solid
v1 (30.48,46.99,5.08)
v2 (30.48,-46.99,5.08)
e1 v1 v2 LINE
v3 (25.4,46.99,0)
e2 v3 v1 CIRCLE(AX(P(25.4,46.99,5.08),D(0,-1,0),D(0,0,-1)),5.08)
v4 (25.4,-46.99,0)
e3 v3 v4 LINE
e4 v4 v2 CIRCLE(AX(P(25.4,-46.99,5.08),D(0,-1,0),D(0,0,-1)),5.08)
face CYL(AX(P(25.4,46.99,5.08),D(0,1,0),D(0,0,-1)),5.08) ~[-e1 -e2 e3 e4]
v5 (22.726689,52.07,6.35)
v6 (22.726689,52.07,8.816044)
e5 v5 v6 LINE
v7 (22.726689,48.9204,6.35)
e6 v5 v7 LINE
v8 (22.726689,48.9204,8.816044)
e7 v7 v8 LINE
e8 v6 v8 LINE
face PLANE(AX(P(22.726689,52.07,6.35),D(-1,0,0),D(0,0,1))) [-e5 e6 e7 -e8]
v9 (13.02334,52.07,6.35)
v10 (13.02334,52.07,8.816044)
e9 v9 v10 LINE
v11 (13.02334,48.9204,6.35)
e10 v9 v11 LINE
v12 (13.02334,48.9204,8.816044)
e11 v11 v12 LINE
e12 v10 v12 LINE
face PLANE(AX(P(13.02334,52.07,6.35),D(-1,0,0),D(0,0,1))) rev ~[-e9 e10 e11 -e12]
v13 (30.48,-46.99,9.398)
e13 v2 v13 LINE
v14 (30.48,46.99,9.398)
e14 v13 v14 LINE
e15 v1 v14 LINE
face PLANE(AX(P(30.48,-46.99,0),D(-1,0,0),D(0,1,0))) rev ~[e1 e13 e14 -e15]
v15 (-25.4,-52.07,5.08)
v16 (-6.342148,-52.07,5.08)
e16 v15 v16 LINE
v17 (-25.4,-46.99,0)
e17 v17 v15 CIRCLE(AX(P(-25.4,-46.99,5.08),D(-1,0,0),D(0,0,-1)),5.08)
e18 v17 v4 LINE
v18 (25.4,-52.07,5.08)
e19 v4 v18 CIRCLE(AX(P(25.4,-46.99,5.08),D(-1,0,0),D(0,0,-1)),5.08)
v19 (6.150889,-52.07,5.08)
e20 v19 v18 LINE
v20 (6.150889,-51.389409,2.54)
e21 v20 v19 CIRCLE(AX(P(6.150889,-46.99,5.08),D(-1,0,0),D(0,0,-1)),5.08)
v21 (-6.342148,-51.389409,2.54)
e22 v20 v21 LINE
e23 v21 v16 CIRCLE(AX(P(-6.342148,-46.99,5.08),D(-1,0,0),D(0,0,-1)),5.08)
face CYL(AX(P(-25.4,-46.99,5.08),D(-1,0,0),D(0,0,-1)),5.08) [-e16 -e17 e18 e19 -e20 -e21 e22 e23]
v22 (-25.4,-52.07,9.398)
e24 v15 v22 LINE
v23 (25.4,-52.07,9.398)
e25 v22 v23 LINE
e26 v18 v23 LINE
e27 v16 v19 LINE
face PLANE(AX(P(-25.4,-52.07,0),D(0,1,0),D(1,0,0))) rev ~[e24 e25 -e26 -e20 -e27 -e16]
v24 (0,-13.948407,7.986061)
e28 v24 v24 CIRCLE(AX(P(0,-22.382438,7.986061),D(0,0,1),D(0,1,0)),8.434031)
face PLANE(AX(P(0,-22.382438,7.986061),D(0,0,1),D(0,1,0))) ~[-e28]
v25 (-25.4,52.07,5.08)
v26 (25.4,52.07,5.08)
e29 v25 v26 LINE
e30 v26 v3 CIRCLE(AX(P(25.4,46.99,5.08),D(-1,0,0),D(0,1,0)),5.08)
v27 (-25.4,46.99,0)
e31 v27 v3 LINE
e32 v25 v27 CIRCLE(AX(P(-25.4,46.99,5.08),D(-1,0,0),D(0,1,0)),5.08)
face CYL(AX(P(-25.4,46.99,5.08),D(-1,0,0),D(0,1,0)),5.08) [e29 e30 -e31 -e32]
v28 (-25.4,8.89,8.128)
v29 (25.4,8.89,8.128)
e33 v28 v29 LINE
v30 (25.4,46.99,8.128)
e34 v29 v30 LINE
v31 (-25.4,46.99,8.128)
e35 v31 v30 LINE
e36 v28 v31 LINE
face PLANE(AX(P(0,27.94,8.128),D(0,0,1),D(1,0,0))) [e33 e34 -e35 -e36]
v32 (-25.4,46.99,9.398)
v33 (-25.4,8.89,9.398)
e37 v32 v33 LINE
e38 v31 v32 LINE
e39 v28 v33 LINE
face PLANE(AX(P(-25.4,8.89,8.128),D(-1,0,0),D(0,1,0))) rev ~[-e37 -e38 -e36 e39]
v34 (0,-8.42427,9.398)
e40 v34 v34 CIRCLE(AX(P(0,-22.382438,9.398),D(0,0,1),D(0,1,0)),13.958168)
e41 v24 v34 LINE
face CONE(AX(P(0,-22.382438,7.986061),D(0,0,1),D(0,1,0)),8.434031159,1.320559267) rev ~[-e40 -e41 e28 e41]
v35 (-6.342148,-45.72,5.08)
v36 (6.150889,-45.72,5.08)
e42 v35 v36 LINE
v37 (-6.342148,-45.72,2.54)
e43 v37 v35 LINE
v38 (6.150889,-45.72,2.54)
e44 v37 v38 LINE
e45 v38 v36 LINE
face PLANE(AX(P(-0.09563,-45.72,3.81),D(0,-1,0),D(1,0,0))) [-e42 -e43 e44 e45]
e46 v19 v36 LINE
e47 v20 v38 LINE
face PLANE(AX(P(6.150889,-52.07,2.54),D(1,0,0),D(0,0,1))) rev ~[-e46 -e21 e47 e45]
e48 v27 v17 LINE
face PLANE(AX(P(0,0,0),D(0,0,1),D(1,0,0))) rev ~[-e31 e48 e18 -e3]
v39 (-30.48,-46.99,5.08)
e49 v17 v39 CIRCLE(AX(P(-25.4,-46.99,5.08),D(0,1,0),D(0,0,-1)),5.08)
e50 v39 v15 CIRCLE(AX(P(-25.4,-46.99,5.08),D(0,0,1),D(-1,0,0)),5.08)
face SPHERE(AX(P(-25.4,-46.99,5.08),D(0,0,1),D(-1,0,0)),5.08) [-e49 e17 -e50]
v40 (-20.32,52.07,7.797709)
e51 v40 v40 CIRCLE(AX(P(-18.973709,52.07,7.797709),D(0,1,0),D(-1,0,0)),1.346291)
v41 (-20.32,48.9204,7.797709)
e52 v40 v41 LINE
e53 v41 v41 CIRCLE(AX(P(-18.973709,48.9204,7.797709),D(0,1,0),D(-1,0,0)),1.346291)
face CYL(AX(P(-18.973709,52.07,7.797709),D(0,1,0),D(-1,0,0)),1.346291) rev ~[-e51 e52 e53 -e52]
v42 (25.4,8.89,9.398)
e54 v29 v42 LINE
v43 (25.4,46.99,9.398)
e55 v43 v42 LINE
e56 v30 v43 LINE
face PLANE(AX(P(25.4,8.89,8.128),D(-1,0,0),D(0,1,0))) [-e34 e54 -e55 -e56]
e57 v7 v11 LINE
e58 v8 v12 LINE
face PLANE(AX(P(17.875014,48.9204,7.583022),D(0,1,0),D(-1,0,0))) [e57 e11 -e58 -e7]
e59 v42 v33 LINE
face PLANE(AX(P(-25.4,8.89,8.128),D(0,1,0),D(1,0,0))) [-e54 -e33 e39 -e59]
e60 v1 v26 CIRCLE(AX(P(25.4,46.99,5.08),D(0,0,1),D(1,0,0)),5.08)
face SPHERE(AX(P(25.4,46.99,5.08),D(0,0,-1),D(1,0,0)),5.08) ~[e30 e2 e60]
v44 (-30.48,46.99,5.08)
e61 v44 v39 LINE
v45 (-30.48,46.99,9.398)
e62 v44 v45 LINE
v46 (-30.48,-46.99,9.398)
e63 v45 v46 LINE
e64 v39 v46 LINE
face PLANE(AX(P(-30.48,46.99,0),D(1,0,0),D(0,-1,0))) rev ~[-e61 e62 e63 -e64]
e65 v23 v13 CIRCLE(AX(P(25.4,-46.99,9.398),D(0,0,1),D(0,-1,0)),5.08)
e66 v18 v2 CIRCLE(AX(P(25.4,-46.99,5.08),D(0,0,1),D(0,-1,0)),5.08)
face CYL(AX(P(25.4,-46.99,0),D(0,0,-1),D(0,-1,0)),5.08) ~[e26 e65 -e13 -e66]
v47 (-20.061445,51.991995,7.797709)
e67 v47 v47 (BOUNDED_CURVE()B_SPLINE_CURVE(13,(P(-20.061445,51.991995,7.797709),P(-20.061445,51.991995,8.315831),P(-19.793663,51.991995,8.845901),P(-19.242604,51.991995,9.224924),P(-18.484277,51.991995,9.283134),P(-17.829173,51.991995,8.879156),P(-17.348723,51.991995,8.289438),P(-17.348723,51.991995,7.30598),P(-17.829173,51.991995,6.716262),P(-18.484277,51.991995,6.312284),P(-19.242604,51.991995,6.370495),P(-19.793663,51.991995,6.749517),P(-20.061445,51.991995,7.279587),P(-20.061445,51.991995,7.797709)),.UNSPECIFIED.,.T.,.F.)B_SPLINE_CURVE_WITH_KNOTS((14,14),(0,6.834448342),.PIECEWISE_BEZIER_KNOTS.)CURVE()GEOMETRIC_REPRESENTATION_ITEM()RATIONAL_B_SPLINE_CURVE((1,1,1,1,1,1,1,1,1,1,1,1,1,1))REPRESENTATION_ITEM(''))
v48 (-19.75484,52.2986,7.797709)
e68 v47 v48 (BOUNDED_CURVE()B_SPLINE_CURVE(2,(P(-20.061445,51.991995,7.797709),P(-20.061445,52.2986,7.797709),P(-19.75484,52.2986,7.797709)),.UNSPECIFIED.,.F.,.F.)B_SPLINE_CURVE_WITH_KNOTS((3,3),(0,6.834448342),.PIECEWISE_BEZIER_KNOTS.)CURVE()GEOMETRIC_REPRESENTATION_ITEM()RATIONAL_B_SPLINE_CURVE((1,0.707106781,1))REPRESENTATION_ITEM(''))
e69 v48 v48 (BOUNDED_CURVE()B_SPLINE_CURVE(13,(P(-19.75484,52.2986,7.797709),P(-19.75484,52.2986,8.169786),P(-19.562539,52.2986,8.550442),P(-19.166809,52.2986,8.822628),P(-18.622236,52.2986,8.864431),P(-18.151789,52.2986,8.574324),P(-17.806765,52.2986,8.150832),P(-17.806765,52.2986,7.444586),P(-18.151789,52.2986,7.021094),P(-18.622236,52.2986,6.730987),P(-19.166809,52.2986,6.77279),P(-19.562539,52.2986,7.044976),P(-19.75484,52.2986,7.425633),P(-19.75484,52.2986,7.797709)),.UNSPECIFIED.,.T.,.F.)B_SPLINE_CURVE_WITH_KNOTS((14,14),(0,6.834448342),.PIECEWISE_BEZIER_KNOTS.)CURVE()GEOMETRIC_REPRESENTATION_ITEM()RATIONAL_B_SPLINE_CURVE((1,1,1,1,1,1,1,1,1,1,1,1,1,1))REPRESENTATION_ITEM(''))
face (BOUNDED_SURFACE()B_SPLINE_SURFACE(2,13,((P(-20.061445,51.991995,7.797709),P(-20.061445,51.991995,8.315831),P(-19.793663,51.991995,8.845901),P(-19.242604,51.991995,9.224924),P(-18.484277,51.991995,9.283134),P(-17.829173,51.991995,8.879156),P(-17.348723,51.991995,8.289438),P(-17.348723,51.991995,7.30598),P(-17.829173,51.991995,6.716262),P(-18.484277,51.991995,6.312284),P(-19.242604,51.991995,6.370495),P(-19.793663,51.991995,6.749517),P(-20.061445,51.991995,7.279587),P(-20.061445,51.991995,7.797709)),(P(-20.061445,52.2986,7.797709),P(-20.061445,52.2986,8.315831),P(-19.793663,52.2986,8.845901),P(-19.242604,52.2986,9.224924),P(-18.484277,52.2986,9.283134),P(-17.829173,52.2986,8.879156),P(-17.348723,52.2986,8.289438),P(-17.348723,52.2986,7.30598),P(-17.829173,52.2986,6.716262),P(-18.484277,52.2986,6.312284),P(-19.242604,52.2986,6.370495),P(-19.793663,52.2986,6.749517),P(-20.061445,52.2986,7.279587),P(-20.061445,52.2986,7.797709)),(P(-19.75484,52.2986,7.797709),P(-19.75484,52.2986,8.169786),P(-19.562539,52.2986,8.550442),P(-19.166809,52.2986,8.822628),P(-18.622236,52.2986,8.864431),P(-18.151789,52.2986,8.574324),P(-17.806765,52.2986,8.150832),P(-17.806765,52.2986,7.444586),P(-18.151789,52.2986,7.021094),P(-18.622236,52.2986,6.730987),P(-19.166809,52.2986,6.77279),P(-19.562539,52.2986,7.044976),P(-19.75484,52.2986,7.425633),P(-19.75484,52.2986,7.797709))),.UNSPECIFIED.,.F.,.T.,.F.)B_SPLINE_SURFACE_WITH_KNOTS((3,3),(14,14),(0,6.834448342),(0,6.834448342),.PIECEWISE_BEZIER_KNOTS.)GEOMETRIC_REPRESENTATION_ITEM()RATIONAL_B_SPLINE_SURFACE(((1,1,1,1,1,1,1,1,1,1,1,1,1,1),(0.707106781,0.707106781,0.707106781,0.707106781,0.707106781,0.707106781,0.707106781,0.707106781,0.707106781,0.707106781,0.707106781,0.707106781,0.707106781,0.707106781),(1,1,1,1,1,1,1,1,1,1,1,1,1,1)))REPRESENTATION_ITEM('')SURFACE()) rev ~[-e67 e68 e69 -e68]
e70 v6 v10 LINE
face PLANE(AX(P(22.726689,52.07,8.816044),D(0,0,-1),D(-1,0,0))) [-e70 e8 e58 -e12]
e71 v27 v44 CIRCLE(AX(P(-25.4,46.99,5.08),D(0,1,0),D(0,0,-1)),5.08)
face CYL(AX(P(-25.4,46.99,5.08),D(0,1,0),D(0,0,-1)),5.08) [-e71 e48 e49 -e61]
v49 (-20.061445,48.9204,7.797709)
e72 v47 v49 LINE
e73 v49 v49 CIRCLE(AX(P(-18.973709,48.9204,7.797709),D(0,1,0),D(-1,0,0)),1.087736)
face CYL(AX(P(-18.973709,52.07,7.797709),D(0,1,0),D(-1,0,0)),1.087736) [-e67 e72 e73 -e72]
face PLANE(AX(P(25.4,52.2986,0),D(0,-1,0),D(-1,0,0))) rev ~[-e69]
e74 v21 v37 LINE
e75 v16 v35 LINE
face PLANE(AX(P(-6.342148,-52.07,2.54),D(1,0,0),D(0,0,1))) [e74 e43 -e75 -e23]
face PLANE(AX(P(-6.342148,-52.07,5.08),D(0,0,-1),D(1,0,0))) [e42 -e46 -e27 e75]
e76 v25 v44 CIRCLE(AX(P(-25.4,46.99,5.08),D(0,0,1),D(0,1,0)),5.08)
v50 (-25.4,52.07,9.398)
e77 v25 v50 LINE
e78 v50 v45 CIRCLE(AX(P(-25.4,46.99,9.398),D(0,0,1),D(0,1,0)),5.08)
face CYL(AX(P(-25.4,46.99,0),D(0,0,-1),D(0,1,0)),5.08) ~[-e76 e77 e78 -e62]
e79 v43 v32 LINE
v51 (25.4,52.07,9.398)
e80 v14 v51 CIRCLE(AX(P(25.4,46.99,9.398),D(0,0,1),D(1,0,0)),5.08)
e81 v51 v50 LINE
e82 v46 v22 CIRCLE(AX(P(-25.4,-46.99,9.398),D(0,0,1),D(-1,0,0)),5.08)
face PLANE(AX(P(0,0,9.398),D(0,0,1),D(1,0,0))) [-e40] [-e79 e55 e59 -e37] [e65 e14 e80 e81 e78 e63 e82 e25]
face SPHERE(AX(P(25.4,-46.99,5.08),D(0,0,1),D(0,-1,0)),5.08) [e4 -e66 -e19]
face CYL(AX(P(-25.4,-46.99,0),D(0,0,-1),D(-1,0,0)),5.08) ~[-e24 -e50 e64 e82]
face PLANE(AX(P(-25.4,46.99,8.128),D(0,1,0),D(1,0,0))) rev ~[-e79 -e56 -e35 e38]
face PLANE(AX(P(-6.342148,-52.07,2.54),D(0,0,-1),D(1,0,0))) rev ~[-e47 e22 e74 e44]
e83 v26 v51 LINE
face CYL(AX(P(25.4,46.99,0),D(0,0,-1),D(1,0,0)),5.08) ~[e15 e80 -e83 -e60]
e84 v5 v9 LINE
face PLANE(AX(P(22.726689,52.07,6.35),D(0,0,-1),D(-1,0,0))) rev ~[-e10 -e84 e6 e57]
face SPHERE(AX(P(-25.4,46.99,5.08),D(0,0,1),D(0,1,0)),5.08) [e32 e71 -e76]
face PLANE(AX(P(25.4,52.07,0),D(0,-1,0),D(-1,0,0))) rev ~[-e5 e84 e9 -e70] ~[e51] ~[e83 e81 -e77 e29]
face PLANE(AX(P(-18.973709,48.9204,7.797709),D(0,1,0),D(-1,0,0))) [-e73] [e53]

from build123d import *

# Parameters (mm, degrees)
F0_R         = 17.78
F0_W         = 50.8
F0_H         = 38.1
F0_R_2       = 7.62
F1_DEPTH     = 9.398
F2_W         = 12.4930366991
F2_H         = 2.54
F3_DEPTH     = 6.35
F4_W         = 9.7033483908
F4_H         = 2.4660443887
F4_R         = 1.3462908927
F4_R_2       = 1.087736237
F5_DEPTH     = 3.1496
F6_DEPTH     = 0.2286
F7_R         = 0.3066051224
F8_T1_DEPTH  = 93.98
F8_T3_DEPTH  = 50.8
F8_T6_ANGLE  = 90
F8_T8_ANGLE  = 90
F8_T10_ANGLE = 90
F8_T12_ANGLE = 90
F9_START     = 8.128
F9_DEPTH     = 1.524


# Not quite as in the source:
# - a fillet or chamfer that OpenCascade refuses, or shapes differently, is made with other operations: its cross-section is extruded or revolved along the edge and cut away or added


with BuildPart() as f1:
    # F0 (on Top) → F1 (new body)
    with BuildSketch(Plane.XY):
        with BuildLine():
            Line((25.4, 52.07), (-25.4, 52.07))
            ThreePointArc((-25.4, 52.07), (-28.9921024484, 50.5821024484), (-30.48, 46.99))
            Line((-30.48, 46.99), (-30.48, -46.99))
            ThreePointArc((-30.48, -46.99), (-28.9921024484, -50.5821024484), (-25.4, -52.07))
            Line((-25.4, -52.07), (25.4, -52.07))
            ThreePointArc((25.4, -52.07), (28.9921024484, -50.5821024484), (30.48, -46.99))
            Line((30.48, -46.99), (30.48, 46.99))
            ThreePointArc((30.48, 46.99), (28.9921024484, 50.5821024484), (25.4, 52.07))
        make_face()
        with Locations((0, -21.59)):
            Circle(F0_R, mode=Mode.SUBTRACT)
        with Locations((0, 27.94)):
            Rectangle(F0_W, F0_H, mode=Mode.SUBTRACT)
        with Locations((0, -21.59)):
            Circle(F0_R)
        with Locations((0, -21.59)):
            Circle(F0_R_2, mode=Mode.SUBTRACT)
        with Locations((0, -21.59)):
            Circle(F0_R_2)
        with Locations((0, 27.94)):
            Rectangle(F0_W, F0_H)
    extrude(amount=F1_DEPTH)

    # F2 (on face) → F3 (cut)
    with BuildSketch(Plane.XZ.offset(52.07)):
        with Locations((-0.0956295989, 3.81)):
            Rectangle(F2_W, F2_H)
    extrude(amount=-F3_DEPTH, mode=Mode.SUBTRACT)

    # F4 (on face) → F5 (cut)
    with BuildSketch(Plane(origin=(0, 52.07, 0), x_dir=(-1, 0, 0), z_dir=(0, 1, 0))):
        with Locations((-17.8750143386, 7.5830221944)):
            Rectangle(F4_W, F4_H)
        with Locations((18.9737091073, 7.7977091073)):
            Circle(F4_R)
        with Locations((18.9737091073, 7.7977091073)):
            Circle(F4_R_2, mode=Mode.SUBTRACT)
    extrude(amount=-F5_DEPTH, mode=Mode.SUBTRACT)

    # F6 (add): a face of the model
    f6_faces = [f1.faces().sort_by_distance(p)[0] for p in [
        (-18.9737091073, 52.07, 7.7977091073),
    ]]
    extrude(f6_faces, amount=F6_DEPTH)

    # F7
    f7_edges = [f1.edges().sort_by_distance(p)[0] for p in [
        (-17.885973, 52.2986, 7.797709),
    ]]
    fillet(f7_edges, radius=F7_R)

    # F8: fillet of radius 5.08 on 1 edges, made by hand

    # F8_s2 → F8_t1 (cut)
    with BuildSketch(Plane.XZ.offset(-46.99)):
        with BuildLine():
            ThreePointArc((-25.4, 0), (-28.9921024484, 1.4878975516), (-30.48, 5.08))
            Line((-30.48, 5.08), (-30.48, 0))
            Line((-30.48, 0), (-25.4, 0))
        make_face()
        with BuildLine():
            ThreePointArc((25.4, 0), (28.9921024484, 1.4878975516), (30.48, 5.08))
            Line((30.48, 5.08), (30.48, 0))
            Line((30.48, 0), (25.4, 0))
        make_face()
    extrude(amount=F8_T1_DEPTH, mode=Mode.SUBTRACT)

    # F8_s4 → F8_t3 (cut)
    with BuildSketch(Plane.YZ.offset(-25.4)):
        with BuildLine():
            ThreePointArc((-46.99, 0), (-50.5821024484, 1.4878975516), (-52.07, 5.08))
            Line((-52.07, 5.08), (-52.07, 0))
            Line((-52.07, 0), (-46.99, 0))
        make_face()
        with BuildLine():
            ThreePointArc((52.07, 5.08), (50.5821024484, 1.4878975516), (46.99, 0))
            Line((46.99, 0), (52.07, 0))
            Line((52.07, 0), (52.07, 5.08))
        make_face()
    extrude(amount=F8_T3_DEPTH, mode=Mode.SUBTRACT)

    # F8_s5 → F8_t6 (revolve, cut)
    with BuildSketch(Plane.XZ.offset(46.99)):
        with BuildLine():
            ThreePointArc((-25.4, 0), (-28.9921024484, 1.4878975516), (-30.48, 5.08))
            Line((-30.48, 5.08), (-30.48, 0))
            Line((-30.48, 0), (-25.4, 0))
        make_face()
    revolve(axis=Axis((-25.4, -46.99, 0), (0, 0, 1)), revolution_arc=F8_T6_ANGLE, mode=Mode.SUBTRACT)

    # F8_s7 → F8_t8 (revolve, cut)
    with BuildSketch(Plane.YZ.offset(25.4)):
        with BuildLine():
            ThreePointArc((-46.99, 0), (-50.5821024484, 1.4878975516), (-52.07, 5.08))
            Line((-52.07, 5.08), (-52.07, 0))
            Line((-52.07, 0), (-46.99, 0))
        make_face()
    revolve(axis=Axis((25.4, -46.99, 0), (0, 0, 1)), revolution_arc=F8_T8_ANGLE, mode=Mode.SUBTRACT)

    # F8_s9 → F8_t10 (revolve, cut)
    with BuildSketch(Plane.XZ.offset(-46.99)):
        with BuildLine():
            ThreePointArc((30.48, 5.08), (28.9921024484, 1.4878975516), (25.4, 0))
            Line((25.4, 0), (30.48, 0))
            Line((30.48, 0), (30.48, 5.08))
        make_face()
    revolve(axis=Axis((25.4, 46.99, 0), (0, 0, 1)), revolution_arc=F8_T10_ANGLE, mode=Mode.SUBTRACT)

    # F8_s11 → F8_t12 (revolve, cut)
    with BuildSketch(Plane.YZ.offset(-25.4)):
        with BuildLine():
            ThreePointArc((46.99, 0), (50.5821024484, 1.4878975516), (52.07, 5.08))
            Line((52.07, 5.08), (52.07, 0))
            Line((52.07, 0), (46.99, 0))
        make_face()
    revolve(axis=Axis((-25.4, 46.99, 0), (0, 0, 1)), revolution_arc=F8_T12_ANGLE, mode=Mode.SUBTRACT)

    # F0 (on Top) → F9 (cut)
    with BuildSketch(Plane.XY.offset(F9_START)):
        with Locations((0, 27.94)):
            Rectangle(F0_W, F0_H)
    extrude(amount=F9_DEPTH, mode=Mode.SUBTRACT)

    # F10 (on Right) → F11 (revolve, cut)
    with BuildSketch(Plane.YZ):
        Polygon((-7.623700425, 9.6026211977), (-22.3824381828, 9.6026211977), (-22.3824381828, 7.986061275), (-13.9484070241, 7.986061275), align=None)
    revolve(axis=Axis((0, -22.3824381828, 9.8022762686), (0, 0, 1)), mode=Mode.SUBTRACT)


solid = f1.part
